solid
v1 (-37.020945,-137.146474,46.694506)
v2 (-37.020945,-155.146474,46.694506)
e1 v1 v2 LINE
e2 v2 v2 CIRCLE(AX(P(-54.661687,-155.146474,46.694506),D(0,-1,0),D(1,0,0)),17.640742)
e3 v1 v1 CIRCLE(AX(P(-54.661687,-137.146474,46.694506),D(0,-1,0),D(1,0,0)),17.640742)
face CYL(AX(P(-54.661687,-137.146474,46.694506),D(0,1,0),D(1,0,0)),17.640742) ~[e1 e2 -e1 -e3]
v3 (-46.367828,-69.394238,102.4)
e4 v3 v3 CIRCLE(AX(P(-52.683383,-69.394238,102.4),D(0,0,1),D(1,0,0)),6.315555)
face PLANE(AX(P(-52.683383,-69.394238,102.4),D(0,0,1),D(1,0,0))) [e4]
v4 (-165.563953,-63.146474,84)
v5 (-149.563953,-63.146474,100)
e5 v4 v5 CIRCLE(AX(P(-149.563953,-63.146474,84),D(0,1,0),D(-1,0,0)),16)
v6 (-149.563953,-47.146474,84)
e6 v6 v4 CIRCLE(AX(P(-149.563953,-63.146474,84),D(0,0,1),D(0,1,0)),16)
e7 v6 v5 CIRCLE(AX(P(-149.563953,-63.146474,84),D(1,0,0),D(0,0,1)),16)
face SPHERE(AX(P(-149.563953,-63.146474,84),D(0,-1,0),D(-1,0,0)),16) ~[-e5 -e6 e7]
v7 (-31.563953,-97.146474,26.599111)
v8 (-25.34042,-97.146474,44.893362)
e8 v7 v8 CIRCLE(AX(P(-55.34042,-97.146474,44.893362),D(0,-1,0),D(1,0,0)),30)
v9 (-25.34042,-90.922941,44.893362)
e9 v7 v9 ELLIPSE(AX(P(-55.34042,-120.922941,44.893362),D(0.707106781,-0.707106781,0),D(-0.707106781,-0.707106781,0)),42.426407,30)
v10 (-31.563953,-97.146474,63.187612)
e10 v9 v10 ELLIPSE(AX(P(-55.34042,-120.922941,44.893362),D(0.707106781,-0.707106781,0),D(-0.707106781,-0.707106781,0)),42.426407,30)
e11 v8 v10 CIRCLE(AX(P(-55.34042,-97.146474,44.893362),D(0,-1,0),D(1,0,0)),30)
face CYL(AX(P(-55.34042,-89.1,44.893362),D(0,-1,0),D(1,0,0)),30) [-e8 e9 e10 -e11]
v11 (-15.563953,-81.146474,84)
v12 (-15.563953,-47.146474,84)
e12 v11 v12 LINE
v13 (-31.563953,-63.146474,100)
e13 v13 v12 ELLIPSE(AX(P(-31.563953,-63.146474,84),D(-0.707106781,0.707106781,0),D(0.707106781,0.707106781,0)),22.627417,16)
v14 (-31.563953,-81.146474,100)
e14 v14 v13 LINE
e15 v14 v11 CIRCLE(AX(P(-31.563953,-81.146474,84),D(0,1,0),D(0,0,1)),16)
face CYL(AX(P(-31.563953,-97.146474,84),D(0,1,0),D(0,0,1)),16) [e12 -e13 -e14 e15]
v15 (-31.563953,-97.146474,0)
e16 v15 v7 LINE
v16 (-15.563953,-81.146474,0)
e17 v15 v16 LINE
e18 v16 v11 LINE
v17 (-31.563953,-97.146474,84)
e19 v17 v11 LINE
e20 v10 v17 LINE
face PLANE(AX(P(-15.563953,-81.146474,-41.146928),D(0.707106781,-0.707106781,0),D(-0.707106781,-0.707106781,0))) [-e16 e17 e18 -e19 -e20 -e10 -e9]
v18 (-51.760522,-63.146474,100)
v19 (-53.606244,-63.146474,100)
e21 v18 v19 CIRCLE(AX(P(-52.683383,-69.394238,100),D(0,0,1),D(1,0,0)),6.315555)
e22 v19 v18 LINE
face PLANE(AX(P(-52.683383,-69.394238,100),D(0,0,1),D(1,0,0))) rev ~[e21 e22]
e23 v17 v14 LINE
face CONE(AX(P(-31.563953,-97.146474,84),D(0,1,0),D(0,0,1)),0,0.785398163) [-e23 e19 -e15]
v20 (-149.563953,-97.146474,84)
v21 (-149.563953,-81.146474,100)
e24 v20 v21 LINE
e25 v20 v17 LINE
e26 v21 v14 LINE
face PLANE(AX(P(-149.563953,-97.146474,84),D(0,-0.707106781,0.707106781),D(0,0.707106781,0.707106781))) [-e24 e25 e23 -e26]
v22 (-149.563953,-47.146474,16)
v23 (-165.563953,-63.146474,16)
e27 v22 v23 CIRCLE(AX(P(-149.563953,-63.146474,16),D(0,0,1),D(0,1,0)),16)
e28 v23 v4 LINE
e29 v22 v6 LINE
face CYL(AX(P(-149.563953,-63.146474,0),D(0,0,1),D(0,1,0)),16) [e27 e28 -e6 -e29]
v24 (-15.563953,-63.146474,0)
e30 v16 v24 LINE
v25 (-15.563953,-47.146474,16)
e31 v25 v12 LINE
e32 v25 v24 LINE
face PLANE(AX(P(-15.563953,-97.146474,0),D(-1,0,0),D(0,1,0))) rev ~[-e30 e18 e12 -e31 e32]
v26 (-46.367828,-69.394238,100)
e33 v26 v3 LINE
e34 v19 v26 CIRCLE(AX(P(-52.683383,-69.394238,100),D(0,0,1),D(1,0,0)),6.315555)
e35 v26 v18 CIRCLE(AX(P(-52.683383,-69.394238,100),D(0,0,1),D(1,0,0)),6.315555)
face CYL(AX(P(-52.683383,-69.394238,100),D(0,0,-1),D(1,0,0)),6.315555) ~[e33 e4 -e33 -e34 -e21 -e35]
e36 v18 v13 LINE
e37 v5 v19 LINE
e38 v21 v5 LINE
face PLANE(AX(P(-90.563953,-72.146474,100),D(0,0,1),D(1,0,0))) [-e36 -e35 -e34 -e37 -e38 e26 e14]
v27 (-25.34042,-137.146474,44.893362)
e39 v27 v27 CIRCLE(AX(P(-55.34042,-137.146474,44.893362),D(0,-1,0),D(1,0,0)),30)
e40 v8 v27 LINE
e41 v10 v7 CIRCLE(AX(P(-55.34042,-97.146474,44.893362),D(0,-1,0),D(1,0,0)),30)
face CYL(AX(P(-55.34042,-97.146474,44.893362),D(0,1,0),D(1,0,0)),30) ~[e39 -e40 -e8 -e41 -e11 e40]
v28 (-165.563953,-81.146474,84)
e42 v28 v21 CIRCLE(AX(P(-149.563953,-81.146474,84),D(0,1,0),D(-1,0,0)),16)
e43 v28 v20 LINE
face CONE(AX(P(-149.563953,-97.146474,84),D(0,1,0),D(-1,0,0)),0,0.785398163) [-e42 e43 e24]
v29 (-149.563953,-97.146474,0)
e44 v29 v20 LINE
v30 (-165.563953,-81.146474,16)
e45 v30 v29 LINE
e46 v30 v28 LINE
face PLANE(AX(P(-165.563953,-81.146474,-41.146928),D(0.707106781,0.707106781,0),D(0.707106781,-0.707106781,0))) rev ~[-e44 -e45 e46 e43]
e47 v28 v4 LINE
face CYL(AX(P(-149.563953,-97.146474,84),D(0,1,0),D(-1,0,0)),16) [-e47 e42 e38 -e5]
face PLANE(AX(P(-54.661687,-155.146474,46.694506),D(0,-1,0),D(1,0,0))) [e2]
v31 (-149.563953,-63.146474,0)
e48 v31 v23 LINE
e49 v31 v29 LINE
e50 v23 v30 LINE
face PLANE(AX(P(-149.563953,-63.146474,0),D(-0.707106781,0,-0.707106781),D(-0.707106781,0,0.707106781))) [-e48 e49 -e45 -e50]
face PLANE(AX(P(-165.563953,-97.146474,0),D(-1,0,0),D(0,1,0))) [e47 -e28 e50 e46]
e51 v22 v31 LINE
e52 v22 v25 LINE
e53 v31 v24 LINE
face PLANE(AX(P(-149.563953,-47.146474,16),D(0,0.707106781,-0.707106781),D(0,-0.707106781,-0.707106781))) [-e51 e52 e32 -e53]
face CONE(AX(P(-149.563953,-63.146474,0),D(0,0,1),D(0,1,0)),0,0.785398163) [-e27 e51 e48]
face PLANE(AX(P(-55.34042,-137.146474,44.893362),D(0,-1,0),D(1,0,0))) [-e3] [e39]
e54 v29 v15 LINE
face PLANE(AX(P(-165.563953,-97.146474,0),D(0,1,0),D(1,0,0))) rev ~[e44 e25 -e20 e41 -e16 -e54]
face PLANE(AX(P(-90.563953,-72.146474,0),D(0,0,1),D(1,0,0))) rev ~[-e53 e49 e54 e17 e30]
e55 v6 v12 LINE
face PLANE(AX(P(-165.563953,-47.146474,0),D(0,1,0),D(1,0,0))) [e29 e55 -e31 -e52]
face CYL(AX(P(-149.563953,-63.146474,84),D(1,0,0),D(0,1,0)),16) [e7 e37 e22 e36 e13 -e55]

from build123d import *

# Parameters (mm, degrees)
F0_W         = 150
F0_H         = 50
F1_DEPTH     = 100
F2_R         = 30
F3_DEPTH     = 40
F4_R         = 16
F5_R         = 16
F6_T1_DEPTH  = 75.1469278075
F6_T3_DEPTH  = 125.1469278075
F6_T5_DEPTH  = 175.1469278075
F6_T7_DEPTH  = 118
F6_T10_ANGLE = 90
F6_T12_ANGLE = 90
F6_T14_ANGLE = 90
F6_T18_DEPTH = 125.1469278075
F6_S19_R     = 30
F6_T20_DEPTH = 65
F7_R         = 6.3155551437
F8_DEPTH     = 2.4
F9_R         = 17.6407421848
F10_DEPTH    = 18


# Not quite as in the source:
# - a fillet or chamfer that OpenCascade refuses, or shapes differently, is made with other operations: its cross-section is extruded or revolved along the edge and cut away or added


with BuildPart() as f1:
    # F0 (on Top) → F1 (new body)
    with BuildSketch(Plane.XY):
        with Locations((-90.5639529228, -72.1464735391)):
            Rectangle(F0_W, F0_H)
    extrude(amount=F1_DEPTH)

    # F2 (on face) → F3 (join)
    with BuildSketch(Plane.XZ.offset(97.1464735391)):
        with Locations((-55.3404204547, 44.8933616281)):
            Circle(F2_R)
    extrude(amount=F3_DEPTH)

    # F4
    f4_edges = [f1.edges().sort_by_distance(p)[0] for p in [
        (-165.563953, -72.146474, 100),
    ]]
    fillet(f4_edges, radius=F4_R)

    # F5
    f5_edges = [f1.edges().sort_by_distance(p)[0] for p in [
        (-15.563953, -72.146474, 100),
        (-82.563953, -47.146474, 100),
    ]]
    fillet(f5_edges, radius=F5_R)

    # F6: chamfer of 16 on 4 edges, made by hand

    # F6_s2 → F6_t1 (cut)
    with BuildSketch(Plane.XZ.offset(63.1464735391)):
        Polygon((-149.5639529228, 0), (-165.5639529228, 16), (-165.5639529228, 0), align=None)
    extrude(amount=F6_T1_DEPTH, mode=Mode.SUBTRACT)

    # F6_s4 → F6_t3 (cut)
    with BuildSketch(Plane.XY.offset(-41.1469278075)):
        Polygon((-165.5639529228, -81.1464735391), (-149.5639529228, -97.1464735391), (-165.5639529228, -97.1464735391), align=None)
    extrude(amount=F6_T3_DEPTH, mode=Mode.SUBTRACT)

    # F6_s6 → F6_t5 (cut)
    with BuildSketch(Plane.YZ.offset(-149.5639529228)):
        Polygon((-47.1464735391, 16), (-63.1464735391, 0), (-47.1464735391, 0), align=None)
    extrude(amount=F6_T5_DEPTH, mode=Mode.SUBTRACT)

    # F6_s8 → F6_t7 (cut)
    with BuildSketch(Plane.YZ.offset(-149.5639529228)):
        Polygon((-97.1464735391, 84), (-81.1464735391, 100), (-97.1464735391, 100), align=None)
    extrude(amount=F6_T7_DEPTH, mode=Mode.SUBTRACT)

    # F6_s9 → F6_t10 (revolve, cut)
    with BuildSketch(Plane.YZ.offset(-149.5639529228)):
        Polygon((-63.1464735391, 0), (-47.1464735391, 16), (-47.1464735391, 0), align=None)
    revolve(axis=Axis((-149.5639529228, -63.1464735391, 0), (0, 0, 1)), revolution_arc=F6_T10_ANGLE, mode=Mode.SUBTRACT)

    # F6_s11 → F6_t12 (revolve, cut)
    with BuildSketch(Plane.XY.offset(84)):
        Polygon((-149.5639529228, -97.1464735391), (-165.5639529228, -81.1464735391), (-165.5639529228, -97.1464735391), align=None)
    revolve(axis=Axis((-149.5639529228, -97.1464735391, 84), (0, 1, 0)), revolution_arc=F6_T12_ANGLE, mode=Mode.SUBTRACT)

    # F6_s13 → F6_t14 (revolve, cut)
    with BuildSketch(Plane.YZ.offset(-31.5639529228)):
        Polygon((-97.1464735391, 84), (-81.1464735391, 100), (-97.1464735391, 100), align=None)
    revolve(axis=Axis((-31.5639529228, -97.1464735391, 84), (0, 1, 0)), revolution_arc=F6_T14_ANGLE, mode=Mode.SUBTRACT)


with BuildPart() as f6_tool16:
    # F6_s17 → F6_t18 (new body)
    with BuildSketch(Plane.XY.offset(-41.1469278075)):
        Polygon((-15.5639529228, -81.1464735391), (-31.5639529228, -97.1464735391), (-15.5639529228, -97.1464735391), align=None)
    extrude(amount=F6_T18_DEPTH)

    # F6_s19 → F6_t20 (cut, symmetric)
    with BuildSketch(Plane.XZ.offset(89.1)):
        with Locations((-55.3404204547, 44.8933616281)):
            Circle(F6_S19_R)
    extrude(amount=F6_T20_DEPTH, both=True, mode=Mode.SUBTRACT)


with BuildPart() as f1_1:
    add(f1.part)

    # F6_t15: cut F6_tool16
    add(f6_tool16.part, mode=Mode.SUBTRACT)

    # F7 (on face) → F8 (join)
    with BuildSketch(Plane.XY.offset(100)):
        with Locations((-52.6833832264, -69.3942382932)):
            Circle(F7_R)
    extrude(amount=F8_DEPTH)

    # F9 (on face) → F10 (join)
    with BuildSketch(Plane.XZ.offset(137.1464735391)):
        with Locations((-54.6616874635, 46.6945059597)):
            Circle(F9_R)
    extrude(amount=F10_DEPTH)


solid = f1_1.part
